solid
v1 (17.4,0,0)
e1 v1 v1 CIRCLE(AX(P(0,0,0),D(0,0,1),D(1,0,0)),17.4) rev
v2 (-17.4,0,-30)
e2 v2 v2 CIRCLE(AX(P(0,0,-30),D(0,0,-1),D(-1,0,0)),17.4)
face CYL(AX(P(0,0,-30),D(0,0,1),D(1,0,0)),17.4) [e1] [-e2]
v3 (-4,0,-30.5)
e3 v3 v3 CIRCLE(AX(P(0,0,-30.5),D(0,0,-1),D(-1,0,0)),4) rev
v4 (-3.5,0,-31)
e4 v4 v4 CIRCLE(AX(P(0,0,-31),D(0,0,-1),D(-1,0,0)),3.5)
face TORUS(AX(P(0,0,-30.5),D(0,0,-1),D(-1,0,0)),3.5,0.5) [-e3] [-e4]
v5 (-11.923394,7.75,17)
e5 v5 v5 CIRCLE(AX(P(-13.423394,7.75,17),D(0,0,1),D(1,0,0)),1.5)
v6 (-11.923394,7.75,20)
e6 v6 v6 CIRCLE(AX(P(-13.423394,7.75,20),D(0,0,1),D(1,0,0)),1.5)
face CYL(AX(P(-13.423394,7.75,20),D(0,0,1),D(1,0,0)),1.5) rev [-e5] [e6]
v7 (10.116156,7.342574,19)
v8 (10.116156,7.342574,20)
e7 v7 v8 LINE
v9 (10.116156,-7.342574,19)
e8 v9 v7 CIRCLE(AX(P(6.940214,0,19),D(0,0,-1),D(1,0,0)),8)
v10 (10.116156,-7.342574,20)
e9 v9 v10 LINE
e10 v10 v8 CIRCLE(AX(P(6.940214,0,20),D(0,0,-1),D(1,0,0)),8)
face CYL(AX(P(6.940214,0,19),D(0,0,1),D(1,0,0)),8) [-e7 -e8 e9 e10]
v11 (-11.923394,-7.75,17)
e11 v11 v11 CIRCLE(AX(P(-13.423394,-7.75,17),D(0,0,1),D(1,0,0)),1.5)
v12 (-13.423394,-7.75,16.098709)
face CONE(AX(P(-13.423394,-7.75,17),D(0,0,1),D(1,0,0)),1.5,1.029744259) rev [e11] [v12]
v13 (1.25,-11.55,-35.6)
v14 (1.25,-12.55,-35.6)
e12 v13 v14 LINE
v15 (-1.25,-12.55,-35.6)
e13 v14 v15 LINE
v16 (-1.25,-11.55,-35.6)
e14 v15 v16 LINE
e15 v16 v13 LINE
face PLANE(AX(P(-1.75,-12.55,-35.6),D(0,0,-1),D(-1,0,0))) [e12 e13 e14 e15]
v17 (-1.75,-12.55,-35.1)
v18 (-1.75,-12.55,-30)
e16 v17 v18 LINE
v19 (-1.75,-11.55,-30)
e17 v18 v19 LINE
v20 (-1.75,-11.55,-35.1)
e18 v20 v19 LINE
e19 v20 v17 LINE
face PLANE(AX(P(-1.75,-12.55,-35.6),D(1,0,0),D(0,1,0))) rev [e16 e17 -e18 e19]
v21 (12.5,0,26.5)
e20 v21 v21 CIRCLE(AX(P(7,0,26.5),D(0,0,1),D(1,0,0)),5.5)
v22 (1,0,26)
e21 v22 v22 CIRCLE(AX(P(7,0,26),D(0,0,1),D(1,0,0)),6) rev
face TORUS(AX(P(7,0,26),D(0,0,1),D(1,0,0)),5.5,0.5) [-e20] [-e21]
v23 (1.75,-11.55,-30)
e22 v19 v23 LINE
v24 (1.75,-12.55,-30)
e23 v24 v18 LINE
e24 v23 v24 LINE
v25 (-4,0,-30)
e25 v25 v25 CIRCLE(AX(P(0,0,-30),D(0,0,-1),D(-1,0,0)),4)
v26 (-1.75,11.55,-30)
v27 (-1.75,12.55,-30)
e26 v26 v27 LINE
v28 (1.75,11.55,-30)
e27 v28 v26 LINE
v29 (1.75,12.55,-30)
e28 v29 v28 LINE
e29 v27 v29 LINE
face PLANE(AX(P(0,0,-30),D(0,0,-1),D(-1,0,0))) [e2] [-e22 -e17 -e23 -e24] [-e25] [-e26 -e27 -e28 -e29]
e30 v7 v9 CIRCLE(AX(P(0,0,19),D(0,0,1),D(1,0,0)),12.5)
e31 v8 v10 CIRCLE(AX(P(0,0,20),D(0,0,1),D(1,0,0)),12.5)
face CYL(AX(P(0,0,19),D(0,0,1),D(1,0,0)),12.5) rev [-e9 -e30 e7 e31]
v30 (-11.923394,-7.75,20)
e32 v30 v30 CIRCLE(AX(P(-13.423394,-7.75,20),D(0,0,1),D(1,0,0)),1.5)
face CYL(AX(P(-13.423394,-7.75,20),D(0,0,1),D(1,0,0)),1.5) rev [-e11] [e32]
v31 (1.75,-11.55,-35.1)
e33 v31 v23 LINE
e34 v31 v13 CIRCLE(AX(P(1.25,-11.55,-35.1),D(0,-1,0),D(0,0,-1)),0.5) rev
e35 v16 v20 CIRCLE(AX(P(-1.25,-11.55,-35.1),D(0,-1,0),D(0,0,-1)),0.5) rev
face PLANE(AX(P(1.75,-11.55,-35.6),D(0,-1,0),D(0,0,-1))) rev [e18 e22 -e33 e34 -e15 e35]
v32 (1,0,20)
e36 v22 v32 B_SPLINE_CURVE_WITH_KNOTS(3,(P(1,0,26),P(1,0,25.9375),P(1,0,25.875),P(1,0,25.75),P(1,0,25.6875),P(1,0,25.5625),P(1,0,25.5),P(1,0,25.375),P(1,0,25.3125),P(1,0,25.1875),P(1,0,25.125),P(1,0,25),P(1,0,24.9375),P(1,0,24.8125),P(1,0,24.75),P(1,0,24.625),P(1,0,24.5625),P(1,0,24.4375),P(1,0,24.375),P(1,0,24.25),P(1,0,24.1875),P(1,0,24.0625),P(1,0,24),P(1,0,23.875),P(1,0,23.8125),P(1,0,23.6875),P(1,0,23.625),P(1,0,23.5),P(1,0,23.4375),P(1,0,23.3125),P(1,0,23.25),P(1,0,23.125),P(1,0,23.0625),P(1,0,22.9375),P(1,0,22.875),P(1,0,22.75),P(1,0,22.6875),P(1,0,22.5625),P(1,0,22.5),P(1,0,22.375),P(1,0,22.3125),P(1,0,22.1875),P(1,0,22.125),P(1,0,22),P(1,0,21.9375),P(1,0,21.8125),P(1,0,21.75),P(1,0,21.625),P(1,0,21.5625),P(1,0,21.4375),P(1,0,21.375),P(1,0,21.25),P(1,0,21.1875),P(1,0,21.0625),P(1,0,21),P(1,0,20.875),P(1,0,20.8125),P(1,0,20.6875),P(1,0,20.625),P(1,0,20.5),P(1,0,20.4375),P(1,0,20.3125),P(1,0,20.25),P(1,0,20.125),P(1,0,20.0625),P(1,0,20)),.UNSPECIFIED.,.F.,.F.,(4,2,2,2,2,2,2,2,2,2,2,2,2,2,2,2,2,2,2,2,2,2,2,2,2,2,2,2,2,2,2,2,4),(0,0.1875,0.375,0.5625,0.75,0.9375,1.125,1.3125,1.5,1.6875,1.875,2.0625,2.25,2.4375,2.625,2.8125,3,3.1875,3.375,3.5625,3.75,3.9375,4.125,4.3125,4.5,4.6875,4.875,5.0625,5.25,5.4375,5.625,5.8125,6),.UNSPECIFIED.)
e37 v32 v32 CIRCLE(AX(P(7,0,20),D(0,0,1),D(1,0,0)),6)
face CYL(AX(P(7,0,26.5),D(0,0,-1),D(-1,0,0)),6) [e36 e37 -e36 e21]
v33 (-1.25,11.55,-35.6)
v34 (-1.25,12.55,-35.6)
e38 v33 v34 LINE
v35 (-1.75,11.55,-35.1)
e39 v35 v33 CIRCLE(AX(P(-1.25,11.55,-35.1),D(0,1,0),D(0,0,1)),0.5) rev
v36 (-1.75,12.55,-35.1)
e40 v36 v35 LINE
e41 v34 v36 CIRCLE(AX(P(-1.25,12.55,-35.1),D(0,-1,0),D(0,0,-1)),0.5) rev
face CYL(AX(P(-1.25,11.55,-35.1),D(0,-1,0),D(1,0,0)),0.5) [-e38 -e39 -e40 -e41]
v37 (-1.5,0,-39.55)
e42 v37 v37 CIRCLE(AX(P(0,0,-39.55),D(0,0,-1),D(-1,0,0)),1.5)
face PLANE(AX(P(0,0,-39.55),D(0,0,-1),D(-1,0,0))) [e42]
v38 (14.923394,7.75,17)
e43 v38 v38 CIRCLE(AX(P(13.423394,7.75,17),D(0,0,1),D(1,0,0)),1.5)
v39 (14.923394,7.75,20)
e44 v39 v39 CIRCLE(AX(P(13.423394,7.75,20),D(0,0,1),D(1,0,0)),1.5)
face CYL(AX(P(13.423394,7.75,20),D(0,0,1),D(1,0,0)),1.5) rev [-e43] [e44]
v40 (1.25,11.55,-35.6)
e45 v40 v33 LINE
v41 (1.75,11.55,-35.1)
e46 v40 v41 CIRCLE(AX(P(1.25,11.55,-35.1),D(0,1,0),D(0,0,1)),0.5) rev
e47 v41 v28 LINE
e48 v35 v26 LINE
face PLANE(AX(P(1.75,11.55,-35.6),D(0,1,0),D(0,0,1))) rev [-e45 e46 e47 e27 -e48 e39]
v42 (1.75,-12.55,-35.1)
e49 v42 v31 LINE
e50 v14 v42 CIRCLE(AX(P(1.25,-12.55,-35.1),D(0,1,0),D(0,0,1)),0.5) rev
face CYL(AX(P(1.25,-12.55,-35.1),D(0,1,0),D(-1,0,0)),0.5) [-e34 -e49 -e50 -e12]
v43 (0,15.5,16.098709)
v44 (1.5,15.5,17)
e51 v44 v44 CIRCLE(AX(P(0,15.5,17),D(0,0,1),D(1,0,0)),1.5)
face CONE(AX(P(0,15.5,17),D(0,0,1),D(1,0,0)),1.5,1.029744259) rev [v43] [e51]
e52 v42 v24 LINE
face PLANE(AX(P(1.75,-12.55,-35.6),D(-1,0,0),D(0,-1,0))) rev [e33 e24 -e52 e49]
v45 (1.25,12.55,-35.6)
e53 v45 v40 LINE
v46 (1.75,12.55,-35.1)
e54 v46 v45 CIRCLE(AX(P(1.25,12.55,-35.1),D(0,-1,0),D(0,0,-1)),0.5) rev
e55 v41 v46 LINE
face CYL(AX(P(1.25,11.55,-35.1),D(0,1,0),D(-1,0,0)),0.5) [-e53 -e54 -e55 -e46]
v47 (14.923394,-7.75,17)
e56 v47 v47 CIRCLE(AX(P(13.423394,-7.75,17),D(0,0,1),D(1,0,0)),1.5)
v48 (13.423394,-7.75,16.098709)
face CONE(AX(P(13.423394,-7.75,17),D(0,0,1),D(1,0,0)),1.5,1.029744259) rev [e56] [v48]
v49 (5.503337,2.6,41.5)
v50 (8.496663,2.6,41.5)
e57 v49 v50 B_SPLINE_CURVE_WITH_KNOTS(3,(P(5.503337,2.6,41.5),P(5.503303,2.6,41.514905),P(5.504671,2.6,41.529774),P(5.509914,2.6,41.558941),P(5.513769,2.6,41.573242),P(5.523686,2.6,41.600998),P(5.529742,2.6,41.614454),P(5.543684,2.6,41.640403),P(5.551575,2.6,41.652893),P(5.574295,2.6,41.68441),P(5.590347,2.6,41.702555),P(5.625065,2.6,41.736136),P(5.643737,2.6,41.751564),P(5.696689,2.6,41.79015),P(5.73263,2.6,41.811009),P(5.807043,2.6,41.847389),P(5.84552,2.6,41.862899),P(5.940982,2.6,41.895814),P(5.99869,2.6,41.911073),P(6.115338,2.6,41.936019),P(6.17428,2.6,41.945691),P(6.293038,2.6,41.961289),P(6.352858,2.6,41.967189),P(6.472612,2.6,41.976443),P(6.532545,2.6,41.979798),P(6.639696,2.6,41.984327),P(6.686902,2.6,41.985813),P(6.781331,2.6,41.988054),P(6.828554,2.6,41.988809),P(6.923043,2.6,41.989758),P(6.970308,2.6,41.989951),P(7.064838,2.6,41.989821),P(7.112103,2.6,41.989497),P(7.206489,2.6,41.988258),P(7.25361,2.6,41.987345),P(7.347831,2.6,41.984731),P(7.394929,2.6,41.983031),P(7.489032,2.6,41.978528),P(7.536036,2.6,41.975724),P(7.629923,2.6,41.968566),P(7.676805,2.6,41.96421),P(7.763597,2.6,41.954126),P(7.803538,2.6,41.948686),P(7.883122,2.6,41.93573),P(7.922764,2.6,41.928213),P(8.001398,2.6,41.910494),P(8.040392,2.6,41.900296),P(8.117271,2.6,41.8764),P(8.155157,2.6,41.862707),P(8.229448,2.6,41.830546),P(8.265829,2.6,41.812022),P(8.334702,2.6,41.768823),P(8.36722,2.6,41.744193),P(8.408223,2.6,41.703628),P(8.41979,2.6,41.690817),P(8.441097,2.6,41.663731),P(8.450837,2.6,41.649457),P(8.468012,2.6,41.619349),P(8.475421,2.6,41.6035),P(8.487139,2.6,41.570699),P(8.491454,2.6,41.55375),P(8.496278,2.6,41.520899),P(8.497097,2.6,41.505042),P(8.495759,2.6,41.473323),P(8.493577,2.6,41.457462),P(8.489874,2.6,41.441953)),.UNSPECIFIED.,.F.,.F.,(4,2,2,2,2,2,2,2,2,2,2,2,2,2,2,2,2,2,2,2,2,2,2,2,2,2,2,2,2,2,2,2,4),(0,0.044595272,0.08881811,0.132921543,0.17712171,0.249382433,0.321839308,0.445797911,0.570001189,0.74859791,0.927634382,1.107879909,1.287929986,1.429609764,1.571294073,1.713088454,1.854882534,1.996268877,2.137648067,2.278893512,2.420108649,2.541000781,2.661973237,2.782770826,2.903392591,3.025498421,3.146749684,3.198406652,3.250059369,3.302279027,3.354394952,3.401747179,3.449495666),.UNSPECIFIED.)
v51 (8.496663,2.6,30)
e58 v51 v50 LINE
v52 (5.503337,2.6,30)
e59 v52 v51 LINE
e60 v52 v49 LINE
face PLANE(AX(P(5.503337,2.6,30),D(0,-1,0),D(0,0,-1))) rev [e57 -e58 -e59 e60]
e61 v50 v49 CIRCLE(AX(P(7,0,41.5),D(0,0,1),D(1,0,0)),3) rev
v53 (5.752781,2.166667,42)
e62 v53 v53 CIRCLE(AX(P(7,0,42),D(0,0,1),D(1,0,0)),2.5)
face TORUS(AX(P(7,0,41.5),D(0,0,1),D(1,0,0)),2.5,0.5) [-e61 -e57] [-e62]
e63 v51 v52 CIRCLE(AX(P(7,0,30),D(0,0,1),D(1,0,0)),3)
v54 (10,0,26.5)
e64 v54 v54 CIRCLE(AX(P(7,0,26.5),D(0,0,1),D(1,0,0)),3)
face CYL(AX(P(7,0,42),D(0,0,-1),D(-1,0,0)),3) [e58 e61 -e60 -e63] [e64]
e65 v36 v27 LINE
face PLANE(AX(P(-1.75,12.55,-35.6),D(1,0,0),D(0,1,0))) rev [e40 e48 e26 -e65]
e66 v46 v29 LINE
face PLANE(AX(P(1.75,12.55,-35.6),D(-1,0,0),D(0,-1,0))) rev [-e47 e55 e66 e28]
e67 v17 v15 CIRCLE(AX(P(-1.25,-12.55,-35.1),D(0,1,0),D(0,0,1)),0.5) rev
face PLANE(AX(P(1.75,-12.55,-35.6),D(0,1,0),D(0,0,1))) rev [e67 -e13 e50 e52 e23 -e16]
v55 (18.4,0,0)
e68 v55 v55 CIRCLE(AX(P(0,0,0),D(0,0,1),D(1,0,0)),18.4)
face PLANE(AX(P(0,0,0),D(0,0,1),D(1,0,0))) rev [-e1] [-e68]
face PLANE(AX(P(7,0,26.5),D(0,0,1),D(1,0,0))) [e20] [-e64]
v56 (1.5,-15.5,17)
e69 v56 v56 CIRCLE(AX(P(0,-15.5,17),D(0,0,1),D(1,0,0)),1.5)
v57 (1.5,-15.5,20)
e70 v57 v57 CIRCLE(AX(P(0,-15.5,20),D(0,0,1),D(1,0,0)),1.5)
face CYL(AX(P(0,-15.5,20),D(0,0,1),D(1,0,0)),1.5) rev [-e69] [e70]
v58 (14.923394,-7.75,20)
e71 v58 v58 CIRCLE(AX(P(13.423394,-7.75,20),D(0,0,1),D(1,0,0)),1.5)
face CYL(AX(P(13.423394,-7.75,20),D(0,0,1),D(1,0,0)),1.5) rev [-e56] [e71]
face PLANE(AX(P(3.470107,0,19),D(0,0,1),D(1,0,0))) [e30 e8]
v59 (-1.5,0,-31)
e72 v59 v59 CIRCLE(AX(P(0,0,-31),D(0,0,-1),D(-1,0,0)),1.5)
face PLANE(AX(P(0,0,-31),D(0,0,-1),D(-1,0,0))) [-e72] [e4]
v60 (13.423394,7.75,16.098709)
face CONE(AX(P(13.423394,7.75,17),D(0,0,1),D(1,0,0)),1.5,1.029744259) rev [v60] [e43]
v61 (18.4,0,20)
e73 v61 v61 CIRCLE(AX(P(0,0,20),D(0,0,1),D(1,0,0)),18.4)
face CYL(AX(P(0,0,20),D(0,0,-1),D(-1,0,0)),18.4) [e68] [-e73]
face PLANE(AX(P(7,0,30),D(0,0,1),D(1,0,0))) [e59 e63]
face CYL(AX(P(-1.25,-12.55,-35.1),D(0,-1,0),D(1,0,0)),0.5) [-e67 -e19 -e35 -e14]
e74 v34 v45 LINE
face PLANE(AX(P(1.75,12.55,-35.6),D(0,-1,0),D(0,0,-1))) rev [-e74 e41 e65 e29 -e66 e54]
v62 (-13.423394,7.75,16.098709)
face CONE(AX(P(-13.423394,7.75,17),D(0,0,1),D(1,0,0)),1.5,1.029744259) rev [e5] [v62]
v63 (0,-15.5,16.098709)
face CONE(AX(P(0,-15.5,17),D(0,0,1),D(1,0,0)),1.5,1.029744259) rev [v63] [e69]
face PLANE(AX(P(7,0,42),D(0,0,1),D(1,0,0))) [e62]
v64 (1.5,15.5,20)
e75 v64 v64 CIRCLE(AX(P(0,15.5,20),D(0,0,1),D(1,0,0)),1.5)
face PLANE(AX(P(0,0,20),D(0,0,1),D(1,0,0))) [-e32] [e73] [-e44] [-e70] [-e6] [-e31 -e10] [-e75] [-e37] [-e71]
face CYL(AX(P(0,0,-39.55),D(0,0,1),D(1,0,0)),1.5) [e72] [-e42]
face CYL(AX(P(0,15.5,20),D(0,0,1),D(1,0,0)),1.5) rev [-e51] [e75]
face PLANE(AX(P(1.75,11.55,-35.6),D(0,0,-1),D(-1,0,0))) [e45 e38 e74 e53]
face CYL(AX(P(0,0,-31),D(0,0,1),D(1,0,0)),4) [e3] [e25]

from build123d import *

# Parameters (mm, degrees)
SKETCH1_R                    = 18.4
BOSS_EXTRUDE1_DEPTH          = 20
SKETCH2_R                    = 17.4
BOSS_EXTRUDE2_DEPTH          = 30
SKETCH3_R                    = 6
BOSS_EXTRUDE3_DEPTH          = 6.5
FILLET1_R                    = 0.5
SKETCH4_R                    = 3
BOSS_EXTRUDE4_DEPTH          = 15.5
CUT_EXTRUDE1_START           = -12
CUT_EXTRUDE1_DEPTH           = 12
F_3_0_3_DIAMETER_HOLE1_D     = 3
F_3_0_3_DIAMETER_HOLE1_DEPTH = 3
F_3_0_3_DIAMETER_HOLE1_TIP   = 0.901290929
CUT_EXTRUDE2_DEPTH           = 1
SKETCH9_R                    = 4
BOSS_EXTRUDE5_DEPTH          = 1
FILLET2_R                    = 0.5
SKETCH11_W                   = 3.5
SKETCH11_H                   = 1
BOSS_EXTRUDE7_DEPTH          = 5.6
FILLET3_R                    = 0.5
SKETCH14_R                   = 1.5
BOSS_EXTRUDE9_DEPTH          = 8.55
FILLET4_R                    = 0.5


with BuildPart() as part:
    # Sketch1 → Boss-Extrude1 (new body)
    with BuildSketch(Plane.XY):
        Circle(SKETCH1_R)
    extrude(amount=BOSS_EXTRUDE1_DEPTH)

    # Sketch2 → Boss-Extrude2 (add)
    with BuildSketch(Plane(origin=(0, 0, 0), x_dir=(-1, 0, 0), z_dir=(0, 0, -1))):
        with Locations(Location((0, 0, 0), (0, 0, 180))):
            Circle(SKETCH2_R)
    extrude(amount=BOSS_EXTRUDE2_DEPTH)

    # Sketch3 → Boss-Extrude3 (add)
    with BuildSketch(Plane.XY.offset(20)):
        with Locations(Location((7, 0, 0), (0, 0, 180))):
            Circle(SKETCH3_R)
    extrude(amount=BOSS_EXTRUDE3_DEPTH)

    # Fillet1
    fillet1_edges = [part.edges().sort_by_distance(p)[0] for p in [
        (13, 0, 26.5),
    ]]
    fillet(fillet1_edges, radius=FILLET1_R)

    # Sketch4 → Boss-Extrude4 (add)
    with BuildSketch(Plane.XY.offset(26.5)):
        with Locations((7, 0)):
            Circle(SKETCH4_R)
    extrude(amount=BOSS_EXTRUDE4_DEPTH)

    # Sketch5 → Cut-Extrude1 (cut)
    with BuildSketch(Plane.XY.offset(42).offset(CUT_EXTRUDE1_START)):
        with BuildLine():
            Line((5.503337045, 2.6), (8.496662955, 2.6))
            ThreePointArc((8.496662955, 2.6), (7, 3), (5.503337045, 2.6))
        make_face()
    extrude(amount=CUT_EXTRUDE1_DEPTH, mode=Mode.SUBTRACT)

    # Ø3.0 (3) Diameter Hole1
    with Locations(Plane.XY.offset(20)):
        with Locations((-13.423393759, 7.75), (-13.423393759, -7.75), (0, -15.5), (13.423393759, 7.75), (0, 15.5), (13.423393759, -7.75)):
            Hole(F_3_0_3_DIAMETER_HOLE1_D / 2, depth=F_3_0_3_DIAMETER_HOLE1_DEPTH)
            with Locations((0, 0, -(F_3_0_3_DIAMETER_HOLE1_DEPTH + F_3_0_3_DIAMETER_HOLE1_TIP / 2))):  # 118° drill point
                Cone(0, F_3_0_3_DIAMETER_HOLE1_D / 2, F_3_0_3_DIAMETER_HOLE1_TIP, mode=Mode.SUBTRACT)

    # Sketch8 → Cut-Extrude2 (cut)
    with BuildSketch(Plane.XY.offset(20)):
        with BuildLine():
            ThreePointArc((10.116155685, 7.342574083), (-12.5, 0), (10.116155685, -7.342574083))
            ThreePointArc((10.116155685, -7.342574083), (-1.05978604, 0), (10.116155685, 7.342574083))
        make_face()
    extrude(amount=-CUT_EXTRUDE2_DEPTH, mode=Mode.SUBTRACT)

    # Sketch9 → Boss-Extrude5 (add)
    with BuildSketch(Plane(origin=(0, 0, -30), x_dir=(-1, 0, 0), z_dir=(0, 0, -1))):
        Circle(SKETCH9_R)
    extrude(amount=BOSS_EXTRUDE5_DEPTH)

    # Fillet2
    fillet2_edges = [part.edges().sort_by_distance(p)[0] for p in [
        (4, 0, -31),
    ]]
    fillet(fillet2_edges, radius=FILLET2_R)

    # Sketch11 → Boss-Extrude7 (add)
    with BuildSketch(Plane(origin=(0, 0, -30), x_dir=(-1, 0, 0), z_dir=(0, 0, -1))):
        with Locations((0, 12.05)):
            Rectangle(SKETCH11_W, SKETCH11_H)
        with Locations((0, -12.05)):
            Rectangle(SKETCH11_W, SKETCH11_H)
    extrude(amount=BOSS_EXTRUDE7_DEPTH)

    # Fillet3
    fillet3_edges = [part.edges().sort_by_distance(p)[0] for p in [
        (1.75, 12.05, -35.6),
        (-1.75, 12.05, -35.6),
        (-1.75, -12.05, -35.6),
        (1.75, -12.05, -35.6),
    ]]
    fillet(fillet3_edges, radius=FILLET3_R)

    # Sketch14 → Boss-Extrude9 (add)
    with BuildSketch(Plane(origin=(0, 0, -31), x_dir=(-1, 0, 0), z_dir=(0, 0, -1))):
        Circle(SKETCH14_R)
    extrude(amount=BOSS_EXTRUDE9_DEPTH)

    # Fillet4
    # the kernel refuses this fillet: 0.5 mm, written as the material it takes off along each edge
    with BuildSketch(Plane(origin=(7, 0, 42), x_dir=(0.4622655728594592, 0.8867415295050277, 0), z_dir=(0.8867415295050277, -0.4622655728594592, 0))) as fillet4_piece_1:
        with BuildLine():
            CenterArc((3 - FILLET4_R, -FILLET4_R), FILLET4_R, 0, 90)
            Line((3 - FILLET4_R, 0), (3 - FILLET4_R, FILLET4_R * 0.02))
            Line((3 - FILLET4_R, FILLET4_R * 0.02), (3 + FILLET4_R * 0.02, FILLET4_R * 0.02))
            Line((3 + FILLET4_R * 0.02, FILLET4_R * 0.02), (3 + FILLET4_R * 0.02, -FILLET4_R))
            Line((3 + FILLET4_R * 0.02, -FILLET4_R), (3, -FILLET4_R))
        make_face()
    revolve(axis=Axis((7, 0, 42), (0, 0, 1)), revolution_arc=297.533397677, mode=Mode.SUBTRACT)
    with BuildSketch(Plane(origin=(7, 0, 42), x_dir=(1, 0, 0), z_dir=(0, -1, 0))) as fillet4_piece_2:
        with BuildLine():
            CenterArc((3 - FILLET4_R, -FILLET4_R), FILLET4_R, 0, 90)
            Line((3 - FILLET4_R, 0), (3 - FILLET4_R, FILLET4_R * 0.02))
            Line((3 - FILLET4_R, FILLET4_R * 0.02), (3 + FILLET4_R * 0.02, FILLET4_R * 0.02))
            Line((3 + FILLET4_R * 0.02, FILLET4_R * 0.02), (3 + FILLET4_R * 0.02, -FILLET4_R))
            Line((3 + FILLET4_R * 0.02, -FILLET4_R), (3, -FILLET4_R))
        make_face()
    revolve(axis=Axis((7, 0, 42), (0, 0, 1)), revolution_arc=117.379597562, mode=Mode.SUBTRACT)


solid = part.part
